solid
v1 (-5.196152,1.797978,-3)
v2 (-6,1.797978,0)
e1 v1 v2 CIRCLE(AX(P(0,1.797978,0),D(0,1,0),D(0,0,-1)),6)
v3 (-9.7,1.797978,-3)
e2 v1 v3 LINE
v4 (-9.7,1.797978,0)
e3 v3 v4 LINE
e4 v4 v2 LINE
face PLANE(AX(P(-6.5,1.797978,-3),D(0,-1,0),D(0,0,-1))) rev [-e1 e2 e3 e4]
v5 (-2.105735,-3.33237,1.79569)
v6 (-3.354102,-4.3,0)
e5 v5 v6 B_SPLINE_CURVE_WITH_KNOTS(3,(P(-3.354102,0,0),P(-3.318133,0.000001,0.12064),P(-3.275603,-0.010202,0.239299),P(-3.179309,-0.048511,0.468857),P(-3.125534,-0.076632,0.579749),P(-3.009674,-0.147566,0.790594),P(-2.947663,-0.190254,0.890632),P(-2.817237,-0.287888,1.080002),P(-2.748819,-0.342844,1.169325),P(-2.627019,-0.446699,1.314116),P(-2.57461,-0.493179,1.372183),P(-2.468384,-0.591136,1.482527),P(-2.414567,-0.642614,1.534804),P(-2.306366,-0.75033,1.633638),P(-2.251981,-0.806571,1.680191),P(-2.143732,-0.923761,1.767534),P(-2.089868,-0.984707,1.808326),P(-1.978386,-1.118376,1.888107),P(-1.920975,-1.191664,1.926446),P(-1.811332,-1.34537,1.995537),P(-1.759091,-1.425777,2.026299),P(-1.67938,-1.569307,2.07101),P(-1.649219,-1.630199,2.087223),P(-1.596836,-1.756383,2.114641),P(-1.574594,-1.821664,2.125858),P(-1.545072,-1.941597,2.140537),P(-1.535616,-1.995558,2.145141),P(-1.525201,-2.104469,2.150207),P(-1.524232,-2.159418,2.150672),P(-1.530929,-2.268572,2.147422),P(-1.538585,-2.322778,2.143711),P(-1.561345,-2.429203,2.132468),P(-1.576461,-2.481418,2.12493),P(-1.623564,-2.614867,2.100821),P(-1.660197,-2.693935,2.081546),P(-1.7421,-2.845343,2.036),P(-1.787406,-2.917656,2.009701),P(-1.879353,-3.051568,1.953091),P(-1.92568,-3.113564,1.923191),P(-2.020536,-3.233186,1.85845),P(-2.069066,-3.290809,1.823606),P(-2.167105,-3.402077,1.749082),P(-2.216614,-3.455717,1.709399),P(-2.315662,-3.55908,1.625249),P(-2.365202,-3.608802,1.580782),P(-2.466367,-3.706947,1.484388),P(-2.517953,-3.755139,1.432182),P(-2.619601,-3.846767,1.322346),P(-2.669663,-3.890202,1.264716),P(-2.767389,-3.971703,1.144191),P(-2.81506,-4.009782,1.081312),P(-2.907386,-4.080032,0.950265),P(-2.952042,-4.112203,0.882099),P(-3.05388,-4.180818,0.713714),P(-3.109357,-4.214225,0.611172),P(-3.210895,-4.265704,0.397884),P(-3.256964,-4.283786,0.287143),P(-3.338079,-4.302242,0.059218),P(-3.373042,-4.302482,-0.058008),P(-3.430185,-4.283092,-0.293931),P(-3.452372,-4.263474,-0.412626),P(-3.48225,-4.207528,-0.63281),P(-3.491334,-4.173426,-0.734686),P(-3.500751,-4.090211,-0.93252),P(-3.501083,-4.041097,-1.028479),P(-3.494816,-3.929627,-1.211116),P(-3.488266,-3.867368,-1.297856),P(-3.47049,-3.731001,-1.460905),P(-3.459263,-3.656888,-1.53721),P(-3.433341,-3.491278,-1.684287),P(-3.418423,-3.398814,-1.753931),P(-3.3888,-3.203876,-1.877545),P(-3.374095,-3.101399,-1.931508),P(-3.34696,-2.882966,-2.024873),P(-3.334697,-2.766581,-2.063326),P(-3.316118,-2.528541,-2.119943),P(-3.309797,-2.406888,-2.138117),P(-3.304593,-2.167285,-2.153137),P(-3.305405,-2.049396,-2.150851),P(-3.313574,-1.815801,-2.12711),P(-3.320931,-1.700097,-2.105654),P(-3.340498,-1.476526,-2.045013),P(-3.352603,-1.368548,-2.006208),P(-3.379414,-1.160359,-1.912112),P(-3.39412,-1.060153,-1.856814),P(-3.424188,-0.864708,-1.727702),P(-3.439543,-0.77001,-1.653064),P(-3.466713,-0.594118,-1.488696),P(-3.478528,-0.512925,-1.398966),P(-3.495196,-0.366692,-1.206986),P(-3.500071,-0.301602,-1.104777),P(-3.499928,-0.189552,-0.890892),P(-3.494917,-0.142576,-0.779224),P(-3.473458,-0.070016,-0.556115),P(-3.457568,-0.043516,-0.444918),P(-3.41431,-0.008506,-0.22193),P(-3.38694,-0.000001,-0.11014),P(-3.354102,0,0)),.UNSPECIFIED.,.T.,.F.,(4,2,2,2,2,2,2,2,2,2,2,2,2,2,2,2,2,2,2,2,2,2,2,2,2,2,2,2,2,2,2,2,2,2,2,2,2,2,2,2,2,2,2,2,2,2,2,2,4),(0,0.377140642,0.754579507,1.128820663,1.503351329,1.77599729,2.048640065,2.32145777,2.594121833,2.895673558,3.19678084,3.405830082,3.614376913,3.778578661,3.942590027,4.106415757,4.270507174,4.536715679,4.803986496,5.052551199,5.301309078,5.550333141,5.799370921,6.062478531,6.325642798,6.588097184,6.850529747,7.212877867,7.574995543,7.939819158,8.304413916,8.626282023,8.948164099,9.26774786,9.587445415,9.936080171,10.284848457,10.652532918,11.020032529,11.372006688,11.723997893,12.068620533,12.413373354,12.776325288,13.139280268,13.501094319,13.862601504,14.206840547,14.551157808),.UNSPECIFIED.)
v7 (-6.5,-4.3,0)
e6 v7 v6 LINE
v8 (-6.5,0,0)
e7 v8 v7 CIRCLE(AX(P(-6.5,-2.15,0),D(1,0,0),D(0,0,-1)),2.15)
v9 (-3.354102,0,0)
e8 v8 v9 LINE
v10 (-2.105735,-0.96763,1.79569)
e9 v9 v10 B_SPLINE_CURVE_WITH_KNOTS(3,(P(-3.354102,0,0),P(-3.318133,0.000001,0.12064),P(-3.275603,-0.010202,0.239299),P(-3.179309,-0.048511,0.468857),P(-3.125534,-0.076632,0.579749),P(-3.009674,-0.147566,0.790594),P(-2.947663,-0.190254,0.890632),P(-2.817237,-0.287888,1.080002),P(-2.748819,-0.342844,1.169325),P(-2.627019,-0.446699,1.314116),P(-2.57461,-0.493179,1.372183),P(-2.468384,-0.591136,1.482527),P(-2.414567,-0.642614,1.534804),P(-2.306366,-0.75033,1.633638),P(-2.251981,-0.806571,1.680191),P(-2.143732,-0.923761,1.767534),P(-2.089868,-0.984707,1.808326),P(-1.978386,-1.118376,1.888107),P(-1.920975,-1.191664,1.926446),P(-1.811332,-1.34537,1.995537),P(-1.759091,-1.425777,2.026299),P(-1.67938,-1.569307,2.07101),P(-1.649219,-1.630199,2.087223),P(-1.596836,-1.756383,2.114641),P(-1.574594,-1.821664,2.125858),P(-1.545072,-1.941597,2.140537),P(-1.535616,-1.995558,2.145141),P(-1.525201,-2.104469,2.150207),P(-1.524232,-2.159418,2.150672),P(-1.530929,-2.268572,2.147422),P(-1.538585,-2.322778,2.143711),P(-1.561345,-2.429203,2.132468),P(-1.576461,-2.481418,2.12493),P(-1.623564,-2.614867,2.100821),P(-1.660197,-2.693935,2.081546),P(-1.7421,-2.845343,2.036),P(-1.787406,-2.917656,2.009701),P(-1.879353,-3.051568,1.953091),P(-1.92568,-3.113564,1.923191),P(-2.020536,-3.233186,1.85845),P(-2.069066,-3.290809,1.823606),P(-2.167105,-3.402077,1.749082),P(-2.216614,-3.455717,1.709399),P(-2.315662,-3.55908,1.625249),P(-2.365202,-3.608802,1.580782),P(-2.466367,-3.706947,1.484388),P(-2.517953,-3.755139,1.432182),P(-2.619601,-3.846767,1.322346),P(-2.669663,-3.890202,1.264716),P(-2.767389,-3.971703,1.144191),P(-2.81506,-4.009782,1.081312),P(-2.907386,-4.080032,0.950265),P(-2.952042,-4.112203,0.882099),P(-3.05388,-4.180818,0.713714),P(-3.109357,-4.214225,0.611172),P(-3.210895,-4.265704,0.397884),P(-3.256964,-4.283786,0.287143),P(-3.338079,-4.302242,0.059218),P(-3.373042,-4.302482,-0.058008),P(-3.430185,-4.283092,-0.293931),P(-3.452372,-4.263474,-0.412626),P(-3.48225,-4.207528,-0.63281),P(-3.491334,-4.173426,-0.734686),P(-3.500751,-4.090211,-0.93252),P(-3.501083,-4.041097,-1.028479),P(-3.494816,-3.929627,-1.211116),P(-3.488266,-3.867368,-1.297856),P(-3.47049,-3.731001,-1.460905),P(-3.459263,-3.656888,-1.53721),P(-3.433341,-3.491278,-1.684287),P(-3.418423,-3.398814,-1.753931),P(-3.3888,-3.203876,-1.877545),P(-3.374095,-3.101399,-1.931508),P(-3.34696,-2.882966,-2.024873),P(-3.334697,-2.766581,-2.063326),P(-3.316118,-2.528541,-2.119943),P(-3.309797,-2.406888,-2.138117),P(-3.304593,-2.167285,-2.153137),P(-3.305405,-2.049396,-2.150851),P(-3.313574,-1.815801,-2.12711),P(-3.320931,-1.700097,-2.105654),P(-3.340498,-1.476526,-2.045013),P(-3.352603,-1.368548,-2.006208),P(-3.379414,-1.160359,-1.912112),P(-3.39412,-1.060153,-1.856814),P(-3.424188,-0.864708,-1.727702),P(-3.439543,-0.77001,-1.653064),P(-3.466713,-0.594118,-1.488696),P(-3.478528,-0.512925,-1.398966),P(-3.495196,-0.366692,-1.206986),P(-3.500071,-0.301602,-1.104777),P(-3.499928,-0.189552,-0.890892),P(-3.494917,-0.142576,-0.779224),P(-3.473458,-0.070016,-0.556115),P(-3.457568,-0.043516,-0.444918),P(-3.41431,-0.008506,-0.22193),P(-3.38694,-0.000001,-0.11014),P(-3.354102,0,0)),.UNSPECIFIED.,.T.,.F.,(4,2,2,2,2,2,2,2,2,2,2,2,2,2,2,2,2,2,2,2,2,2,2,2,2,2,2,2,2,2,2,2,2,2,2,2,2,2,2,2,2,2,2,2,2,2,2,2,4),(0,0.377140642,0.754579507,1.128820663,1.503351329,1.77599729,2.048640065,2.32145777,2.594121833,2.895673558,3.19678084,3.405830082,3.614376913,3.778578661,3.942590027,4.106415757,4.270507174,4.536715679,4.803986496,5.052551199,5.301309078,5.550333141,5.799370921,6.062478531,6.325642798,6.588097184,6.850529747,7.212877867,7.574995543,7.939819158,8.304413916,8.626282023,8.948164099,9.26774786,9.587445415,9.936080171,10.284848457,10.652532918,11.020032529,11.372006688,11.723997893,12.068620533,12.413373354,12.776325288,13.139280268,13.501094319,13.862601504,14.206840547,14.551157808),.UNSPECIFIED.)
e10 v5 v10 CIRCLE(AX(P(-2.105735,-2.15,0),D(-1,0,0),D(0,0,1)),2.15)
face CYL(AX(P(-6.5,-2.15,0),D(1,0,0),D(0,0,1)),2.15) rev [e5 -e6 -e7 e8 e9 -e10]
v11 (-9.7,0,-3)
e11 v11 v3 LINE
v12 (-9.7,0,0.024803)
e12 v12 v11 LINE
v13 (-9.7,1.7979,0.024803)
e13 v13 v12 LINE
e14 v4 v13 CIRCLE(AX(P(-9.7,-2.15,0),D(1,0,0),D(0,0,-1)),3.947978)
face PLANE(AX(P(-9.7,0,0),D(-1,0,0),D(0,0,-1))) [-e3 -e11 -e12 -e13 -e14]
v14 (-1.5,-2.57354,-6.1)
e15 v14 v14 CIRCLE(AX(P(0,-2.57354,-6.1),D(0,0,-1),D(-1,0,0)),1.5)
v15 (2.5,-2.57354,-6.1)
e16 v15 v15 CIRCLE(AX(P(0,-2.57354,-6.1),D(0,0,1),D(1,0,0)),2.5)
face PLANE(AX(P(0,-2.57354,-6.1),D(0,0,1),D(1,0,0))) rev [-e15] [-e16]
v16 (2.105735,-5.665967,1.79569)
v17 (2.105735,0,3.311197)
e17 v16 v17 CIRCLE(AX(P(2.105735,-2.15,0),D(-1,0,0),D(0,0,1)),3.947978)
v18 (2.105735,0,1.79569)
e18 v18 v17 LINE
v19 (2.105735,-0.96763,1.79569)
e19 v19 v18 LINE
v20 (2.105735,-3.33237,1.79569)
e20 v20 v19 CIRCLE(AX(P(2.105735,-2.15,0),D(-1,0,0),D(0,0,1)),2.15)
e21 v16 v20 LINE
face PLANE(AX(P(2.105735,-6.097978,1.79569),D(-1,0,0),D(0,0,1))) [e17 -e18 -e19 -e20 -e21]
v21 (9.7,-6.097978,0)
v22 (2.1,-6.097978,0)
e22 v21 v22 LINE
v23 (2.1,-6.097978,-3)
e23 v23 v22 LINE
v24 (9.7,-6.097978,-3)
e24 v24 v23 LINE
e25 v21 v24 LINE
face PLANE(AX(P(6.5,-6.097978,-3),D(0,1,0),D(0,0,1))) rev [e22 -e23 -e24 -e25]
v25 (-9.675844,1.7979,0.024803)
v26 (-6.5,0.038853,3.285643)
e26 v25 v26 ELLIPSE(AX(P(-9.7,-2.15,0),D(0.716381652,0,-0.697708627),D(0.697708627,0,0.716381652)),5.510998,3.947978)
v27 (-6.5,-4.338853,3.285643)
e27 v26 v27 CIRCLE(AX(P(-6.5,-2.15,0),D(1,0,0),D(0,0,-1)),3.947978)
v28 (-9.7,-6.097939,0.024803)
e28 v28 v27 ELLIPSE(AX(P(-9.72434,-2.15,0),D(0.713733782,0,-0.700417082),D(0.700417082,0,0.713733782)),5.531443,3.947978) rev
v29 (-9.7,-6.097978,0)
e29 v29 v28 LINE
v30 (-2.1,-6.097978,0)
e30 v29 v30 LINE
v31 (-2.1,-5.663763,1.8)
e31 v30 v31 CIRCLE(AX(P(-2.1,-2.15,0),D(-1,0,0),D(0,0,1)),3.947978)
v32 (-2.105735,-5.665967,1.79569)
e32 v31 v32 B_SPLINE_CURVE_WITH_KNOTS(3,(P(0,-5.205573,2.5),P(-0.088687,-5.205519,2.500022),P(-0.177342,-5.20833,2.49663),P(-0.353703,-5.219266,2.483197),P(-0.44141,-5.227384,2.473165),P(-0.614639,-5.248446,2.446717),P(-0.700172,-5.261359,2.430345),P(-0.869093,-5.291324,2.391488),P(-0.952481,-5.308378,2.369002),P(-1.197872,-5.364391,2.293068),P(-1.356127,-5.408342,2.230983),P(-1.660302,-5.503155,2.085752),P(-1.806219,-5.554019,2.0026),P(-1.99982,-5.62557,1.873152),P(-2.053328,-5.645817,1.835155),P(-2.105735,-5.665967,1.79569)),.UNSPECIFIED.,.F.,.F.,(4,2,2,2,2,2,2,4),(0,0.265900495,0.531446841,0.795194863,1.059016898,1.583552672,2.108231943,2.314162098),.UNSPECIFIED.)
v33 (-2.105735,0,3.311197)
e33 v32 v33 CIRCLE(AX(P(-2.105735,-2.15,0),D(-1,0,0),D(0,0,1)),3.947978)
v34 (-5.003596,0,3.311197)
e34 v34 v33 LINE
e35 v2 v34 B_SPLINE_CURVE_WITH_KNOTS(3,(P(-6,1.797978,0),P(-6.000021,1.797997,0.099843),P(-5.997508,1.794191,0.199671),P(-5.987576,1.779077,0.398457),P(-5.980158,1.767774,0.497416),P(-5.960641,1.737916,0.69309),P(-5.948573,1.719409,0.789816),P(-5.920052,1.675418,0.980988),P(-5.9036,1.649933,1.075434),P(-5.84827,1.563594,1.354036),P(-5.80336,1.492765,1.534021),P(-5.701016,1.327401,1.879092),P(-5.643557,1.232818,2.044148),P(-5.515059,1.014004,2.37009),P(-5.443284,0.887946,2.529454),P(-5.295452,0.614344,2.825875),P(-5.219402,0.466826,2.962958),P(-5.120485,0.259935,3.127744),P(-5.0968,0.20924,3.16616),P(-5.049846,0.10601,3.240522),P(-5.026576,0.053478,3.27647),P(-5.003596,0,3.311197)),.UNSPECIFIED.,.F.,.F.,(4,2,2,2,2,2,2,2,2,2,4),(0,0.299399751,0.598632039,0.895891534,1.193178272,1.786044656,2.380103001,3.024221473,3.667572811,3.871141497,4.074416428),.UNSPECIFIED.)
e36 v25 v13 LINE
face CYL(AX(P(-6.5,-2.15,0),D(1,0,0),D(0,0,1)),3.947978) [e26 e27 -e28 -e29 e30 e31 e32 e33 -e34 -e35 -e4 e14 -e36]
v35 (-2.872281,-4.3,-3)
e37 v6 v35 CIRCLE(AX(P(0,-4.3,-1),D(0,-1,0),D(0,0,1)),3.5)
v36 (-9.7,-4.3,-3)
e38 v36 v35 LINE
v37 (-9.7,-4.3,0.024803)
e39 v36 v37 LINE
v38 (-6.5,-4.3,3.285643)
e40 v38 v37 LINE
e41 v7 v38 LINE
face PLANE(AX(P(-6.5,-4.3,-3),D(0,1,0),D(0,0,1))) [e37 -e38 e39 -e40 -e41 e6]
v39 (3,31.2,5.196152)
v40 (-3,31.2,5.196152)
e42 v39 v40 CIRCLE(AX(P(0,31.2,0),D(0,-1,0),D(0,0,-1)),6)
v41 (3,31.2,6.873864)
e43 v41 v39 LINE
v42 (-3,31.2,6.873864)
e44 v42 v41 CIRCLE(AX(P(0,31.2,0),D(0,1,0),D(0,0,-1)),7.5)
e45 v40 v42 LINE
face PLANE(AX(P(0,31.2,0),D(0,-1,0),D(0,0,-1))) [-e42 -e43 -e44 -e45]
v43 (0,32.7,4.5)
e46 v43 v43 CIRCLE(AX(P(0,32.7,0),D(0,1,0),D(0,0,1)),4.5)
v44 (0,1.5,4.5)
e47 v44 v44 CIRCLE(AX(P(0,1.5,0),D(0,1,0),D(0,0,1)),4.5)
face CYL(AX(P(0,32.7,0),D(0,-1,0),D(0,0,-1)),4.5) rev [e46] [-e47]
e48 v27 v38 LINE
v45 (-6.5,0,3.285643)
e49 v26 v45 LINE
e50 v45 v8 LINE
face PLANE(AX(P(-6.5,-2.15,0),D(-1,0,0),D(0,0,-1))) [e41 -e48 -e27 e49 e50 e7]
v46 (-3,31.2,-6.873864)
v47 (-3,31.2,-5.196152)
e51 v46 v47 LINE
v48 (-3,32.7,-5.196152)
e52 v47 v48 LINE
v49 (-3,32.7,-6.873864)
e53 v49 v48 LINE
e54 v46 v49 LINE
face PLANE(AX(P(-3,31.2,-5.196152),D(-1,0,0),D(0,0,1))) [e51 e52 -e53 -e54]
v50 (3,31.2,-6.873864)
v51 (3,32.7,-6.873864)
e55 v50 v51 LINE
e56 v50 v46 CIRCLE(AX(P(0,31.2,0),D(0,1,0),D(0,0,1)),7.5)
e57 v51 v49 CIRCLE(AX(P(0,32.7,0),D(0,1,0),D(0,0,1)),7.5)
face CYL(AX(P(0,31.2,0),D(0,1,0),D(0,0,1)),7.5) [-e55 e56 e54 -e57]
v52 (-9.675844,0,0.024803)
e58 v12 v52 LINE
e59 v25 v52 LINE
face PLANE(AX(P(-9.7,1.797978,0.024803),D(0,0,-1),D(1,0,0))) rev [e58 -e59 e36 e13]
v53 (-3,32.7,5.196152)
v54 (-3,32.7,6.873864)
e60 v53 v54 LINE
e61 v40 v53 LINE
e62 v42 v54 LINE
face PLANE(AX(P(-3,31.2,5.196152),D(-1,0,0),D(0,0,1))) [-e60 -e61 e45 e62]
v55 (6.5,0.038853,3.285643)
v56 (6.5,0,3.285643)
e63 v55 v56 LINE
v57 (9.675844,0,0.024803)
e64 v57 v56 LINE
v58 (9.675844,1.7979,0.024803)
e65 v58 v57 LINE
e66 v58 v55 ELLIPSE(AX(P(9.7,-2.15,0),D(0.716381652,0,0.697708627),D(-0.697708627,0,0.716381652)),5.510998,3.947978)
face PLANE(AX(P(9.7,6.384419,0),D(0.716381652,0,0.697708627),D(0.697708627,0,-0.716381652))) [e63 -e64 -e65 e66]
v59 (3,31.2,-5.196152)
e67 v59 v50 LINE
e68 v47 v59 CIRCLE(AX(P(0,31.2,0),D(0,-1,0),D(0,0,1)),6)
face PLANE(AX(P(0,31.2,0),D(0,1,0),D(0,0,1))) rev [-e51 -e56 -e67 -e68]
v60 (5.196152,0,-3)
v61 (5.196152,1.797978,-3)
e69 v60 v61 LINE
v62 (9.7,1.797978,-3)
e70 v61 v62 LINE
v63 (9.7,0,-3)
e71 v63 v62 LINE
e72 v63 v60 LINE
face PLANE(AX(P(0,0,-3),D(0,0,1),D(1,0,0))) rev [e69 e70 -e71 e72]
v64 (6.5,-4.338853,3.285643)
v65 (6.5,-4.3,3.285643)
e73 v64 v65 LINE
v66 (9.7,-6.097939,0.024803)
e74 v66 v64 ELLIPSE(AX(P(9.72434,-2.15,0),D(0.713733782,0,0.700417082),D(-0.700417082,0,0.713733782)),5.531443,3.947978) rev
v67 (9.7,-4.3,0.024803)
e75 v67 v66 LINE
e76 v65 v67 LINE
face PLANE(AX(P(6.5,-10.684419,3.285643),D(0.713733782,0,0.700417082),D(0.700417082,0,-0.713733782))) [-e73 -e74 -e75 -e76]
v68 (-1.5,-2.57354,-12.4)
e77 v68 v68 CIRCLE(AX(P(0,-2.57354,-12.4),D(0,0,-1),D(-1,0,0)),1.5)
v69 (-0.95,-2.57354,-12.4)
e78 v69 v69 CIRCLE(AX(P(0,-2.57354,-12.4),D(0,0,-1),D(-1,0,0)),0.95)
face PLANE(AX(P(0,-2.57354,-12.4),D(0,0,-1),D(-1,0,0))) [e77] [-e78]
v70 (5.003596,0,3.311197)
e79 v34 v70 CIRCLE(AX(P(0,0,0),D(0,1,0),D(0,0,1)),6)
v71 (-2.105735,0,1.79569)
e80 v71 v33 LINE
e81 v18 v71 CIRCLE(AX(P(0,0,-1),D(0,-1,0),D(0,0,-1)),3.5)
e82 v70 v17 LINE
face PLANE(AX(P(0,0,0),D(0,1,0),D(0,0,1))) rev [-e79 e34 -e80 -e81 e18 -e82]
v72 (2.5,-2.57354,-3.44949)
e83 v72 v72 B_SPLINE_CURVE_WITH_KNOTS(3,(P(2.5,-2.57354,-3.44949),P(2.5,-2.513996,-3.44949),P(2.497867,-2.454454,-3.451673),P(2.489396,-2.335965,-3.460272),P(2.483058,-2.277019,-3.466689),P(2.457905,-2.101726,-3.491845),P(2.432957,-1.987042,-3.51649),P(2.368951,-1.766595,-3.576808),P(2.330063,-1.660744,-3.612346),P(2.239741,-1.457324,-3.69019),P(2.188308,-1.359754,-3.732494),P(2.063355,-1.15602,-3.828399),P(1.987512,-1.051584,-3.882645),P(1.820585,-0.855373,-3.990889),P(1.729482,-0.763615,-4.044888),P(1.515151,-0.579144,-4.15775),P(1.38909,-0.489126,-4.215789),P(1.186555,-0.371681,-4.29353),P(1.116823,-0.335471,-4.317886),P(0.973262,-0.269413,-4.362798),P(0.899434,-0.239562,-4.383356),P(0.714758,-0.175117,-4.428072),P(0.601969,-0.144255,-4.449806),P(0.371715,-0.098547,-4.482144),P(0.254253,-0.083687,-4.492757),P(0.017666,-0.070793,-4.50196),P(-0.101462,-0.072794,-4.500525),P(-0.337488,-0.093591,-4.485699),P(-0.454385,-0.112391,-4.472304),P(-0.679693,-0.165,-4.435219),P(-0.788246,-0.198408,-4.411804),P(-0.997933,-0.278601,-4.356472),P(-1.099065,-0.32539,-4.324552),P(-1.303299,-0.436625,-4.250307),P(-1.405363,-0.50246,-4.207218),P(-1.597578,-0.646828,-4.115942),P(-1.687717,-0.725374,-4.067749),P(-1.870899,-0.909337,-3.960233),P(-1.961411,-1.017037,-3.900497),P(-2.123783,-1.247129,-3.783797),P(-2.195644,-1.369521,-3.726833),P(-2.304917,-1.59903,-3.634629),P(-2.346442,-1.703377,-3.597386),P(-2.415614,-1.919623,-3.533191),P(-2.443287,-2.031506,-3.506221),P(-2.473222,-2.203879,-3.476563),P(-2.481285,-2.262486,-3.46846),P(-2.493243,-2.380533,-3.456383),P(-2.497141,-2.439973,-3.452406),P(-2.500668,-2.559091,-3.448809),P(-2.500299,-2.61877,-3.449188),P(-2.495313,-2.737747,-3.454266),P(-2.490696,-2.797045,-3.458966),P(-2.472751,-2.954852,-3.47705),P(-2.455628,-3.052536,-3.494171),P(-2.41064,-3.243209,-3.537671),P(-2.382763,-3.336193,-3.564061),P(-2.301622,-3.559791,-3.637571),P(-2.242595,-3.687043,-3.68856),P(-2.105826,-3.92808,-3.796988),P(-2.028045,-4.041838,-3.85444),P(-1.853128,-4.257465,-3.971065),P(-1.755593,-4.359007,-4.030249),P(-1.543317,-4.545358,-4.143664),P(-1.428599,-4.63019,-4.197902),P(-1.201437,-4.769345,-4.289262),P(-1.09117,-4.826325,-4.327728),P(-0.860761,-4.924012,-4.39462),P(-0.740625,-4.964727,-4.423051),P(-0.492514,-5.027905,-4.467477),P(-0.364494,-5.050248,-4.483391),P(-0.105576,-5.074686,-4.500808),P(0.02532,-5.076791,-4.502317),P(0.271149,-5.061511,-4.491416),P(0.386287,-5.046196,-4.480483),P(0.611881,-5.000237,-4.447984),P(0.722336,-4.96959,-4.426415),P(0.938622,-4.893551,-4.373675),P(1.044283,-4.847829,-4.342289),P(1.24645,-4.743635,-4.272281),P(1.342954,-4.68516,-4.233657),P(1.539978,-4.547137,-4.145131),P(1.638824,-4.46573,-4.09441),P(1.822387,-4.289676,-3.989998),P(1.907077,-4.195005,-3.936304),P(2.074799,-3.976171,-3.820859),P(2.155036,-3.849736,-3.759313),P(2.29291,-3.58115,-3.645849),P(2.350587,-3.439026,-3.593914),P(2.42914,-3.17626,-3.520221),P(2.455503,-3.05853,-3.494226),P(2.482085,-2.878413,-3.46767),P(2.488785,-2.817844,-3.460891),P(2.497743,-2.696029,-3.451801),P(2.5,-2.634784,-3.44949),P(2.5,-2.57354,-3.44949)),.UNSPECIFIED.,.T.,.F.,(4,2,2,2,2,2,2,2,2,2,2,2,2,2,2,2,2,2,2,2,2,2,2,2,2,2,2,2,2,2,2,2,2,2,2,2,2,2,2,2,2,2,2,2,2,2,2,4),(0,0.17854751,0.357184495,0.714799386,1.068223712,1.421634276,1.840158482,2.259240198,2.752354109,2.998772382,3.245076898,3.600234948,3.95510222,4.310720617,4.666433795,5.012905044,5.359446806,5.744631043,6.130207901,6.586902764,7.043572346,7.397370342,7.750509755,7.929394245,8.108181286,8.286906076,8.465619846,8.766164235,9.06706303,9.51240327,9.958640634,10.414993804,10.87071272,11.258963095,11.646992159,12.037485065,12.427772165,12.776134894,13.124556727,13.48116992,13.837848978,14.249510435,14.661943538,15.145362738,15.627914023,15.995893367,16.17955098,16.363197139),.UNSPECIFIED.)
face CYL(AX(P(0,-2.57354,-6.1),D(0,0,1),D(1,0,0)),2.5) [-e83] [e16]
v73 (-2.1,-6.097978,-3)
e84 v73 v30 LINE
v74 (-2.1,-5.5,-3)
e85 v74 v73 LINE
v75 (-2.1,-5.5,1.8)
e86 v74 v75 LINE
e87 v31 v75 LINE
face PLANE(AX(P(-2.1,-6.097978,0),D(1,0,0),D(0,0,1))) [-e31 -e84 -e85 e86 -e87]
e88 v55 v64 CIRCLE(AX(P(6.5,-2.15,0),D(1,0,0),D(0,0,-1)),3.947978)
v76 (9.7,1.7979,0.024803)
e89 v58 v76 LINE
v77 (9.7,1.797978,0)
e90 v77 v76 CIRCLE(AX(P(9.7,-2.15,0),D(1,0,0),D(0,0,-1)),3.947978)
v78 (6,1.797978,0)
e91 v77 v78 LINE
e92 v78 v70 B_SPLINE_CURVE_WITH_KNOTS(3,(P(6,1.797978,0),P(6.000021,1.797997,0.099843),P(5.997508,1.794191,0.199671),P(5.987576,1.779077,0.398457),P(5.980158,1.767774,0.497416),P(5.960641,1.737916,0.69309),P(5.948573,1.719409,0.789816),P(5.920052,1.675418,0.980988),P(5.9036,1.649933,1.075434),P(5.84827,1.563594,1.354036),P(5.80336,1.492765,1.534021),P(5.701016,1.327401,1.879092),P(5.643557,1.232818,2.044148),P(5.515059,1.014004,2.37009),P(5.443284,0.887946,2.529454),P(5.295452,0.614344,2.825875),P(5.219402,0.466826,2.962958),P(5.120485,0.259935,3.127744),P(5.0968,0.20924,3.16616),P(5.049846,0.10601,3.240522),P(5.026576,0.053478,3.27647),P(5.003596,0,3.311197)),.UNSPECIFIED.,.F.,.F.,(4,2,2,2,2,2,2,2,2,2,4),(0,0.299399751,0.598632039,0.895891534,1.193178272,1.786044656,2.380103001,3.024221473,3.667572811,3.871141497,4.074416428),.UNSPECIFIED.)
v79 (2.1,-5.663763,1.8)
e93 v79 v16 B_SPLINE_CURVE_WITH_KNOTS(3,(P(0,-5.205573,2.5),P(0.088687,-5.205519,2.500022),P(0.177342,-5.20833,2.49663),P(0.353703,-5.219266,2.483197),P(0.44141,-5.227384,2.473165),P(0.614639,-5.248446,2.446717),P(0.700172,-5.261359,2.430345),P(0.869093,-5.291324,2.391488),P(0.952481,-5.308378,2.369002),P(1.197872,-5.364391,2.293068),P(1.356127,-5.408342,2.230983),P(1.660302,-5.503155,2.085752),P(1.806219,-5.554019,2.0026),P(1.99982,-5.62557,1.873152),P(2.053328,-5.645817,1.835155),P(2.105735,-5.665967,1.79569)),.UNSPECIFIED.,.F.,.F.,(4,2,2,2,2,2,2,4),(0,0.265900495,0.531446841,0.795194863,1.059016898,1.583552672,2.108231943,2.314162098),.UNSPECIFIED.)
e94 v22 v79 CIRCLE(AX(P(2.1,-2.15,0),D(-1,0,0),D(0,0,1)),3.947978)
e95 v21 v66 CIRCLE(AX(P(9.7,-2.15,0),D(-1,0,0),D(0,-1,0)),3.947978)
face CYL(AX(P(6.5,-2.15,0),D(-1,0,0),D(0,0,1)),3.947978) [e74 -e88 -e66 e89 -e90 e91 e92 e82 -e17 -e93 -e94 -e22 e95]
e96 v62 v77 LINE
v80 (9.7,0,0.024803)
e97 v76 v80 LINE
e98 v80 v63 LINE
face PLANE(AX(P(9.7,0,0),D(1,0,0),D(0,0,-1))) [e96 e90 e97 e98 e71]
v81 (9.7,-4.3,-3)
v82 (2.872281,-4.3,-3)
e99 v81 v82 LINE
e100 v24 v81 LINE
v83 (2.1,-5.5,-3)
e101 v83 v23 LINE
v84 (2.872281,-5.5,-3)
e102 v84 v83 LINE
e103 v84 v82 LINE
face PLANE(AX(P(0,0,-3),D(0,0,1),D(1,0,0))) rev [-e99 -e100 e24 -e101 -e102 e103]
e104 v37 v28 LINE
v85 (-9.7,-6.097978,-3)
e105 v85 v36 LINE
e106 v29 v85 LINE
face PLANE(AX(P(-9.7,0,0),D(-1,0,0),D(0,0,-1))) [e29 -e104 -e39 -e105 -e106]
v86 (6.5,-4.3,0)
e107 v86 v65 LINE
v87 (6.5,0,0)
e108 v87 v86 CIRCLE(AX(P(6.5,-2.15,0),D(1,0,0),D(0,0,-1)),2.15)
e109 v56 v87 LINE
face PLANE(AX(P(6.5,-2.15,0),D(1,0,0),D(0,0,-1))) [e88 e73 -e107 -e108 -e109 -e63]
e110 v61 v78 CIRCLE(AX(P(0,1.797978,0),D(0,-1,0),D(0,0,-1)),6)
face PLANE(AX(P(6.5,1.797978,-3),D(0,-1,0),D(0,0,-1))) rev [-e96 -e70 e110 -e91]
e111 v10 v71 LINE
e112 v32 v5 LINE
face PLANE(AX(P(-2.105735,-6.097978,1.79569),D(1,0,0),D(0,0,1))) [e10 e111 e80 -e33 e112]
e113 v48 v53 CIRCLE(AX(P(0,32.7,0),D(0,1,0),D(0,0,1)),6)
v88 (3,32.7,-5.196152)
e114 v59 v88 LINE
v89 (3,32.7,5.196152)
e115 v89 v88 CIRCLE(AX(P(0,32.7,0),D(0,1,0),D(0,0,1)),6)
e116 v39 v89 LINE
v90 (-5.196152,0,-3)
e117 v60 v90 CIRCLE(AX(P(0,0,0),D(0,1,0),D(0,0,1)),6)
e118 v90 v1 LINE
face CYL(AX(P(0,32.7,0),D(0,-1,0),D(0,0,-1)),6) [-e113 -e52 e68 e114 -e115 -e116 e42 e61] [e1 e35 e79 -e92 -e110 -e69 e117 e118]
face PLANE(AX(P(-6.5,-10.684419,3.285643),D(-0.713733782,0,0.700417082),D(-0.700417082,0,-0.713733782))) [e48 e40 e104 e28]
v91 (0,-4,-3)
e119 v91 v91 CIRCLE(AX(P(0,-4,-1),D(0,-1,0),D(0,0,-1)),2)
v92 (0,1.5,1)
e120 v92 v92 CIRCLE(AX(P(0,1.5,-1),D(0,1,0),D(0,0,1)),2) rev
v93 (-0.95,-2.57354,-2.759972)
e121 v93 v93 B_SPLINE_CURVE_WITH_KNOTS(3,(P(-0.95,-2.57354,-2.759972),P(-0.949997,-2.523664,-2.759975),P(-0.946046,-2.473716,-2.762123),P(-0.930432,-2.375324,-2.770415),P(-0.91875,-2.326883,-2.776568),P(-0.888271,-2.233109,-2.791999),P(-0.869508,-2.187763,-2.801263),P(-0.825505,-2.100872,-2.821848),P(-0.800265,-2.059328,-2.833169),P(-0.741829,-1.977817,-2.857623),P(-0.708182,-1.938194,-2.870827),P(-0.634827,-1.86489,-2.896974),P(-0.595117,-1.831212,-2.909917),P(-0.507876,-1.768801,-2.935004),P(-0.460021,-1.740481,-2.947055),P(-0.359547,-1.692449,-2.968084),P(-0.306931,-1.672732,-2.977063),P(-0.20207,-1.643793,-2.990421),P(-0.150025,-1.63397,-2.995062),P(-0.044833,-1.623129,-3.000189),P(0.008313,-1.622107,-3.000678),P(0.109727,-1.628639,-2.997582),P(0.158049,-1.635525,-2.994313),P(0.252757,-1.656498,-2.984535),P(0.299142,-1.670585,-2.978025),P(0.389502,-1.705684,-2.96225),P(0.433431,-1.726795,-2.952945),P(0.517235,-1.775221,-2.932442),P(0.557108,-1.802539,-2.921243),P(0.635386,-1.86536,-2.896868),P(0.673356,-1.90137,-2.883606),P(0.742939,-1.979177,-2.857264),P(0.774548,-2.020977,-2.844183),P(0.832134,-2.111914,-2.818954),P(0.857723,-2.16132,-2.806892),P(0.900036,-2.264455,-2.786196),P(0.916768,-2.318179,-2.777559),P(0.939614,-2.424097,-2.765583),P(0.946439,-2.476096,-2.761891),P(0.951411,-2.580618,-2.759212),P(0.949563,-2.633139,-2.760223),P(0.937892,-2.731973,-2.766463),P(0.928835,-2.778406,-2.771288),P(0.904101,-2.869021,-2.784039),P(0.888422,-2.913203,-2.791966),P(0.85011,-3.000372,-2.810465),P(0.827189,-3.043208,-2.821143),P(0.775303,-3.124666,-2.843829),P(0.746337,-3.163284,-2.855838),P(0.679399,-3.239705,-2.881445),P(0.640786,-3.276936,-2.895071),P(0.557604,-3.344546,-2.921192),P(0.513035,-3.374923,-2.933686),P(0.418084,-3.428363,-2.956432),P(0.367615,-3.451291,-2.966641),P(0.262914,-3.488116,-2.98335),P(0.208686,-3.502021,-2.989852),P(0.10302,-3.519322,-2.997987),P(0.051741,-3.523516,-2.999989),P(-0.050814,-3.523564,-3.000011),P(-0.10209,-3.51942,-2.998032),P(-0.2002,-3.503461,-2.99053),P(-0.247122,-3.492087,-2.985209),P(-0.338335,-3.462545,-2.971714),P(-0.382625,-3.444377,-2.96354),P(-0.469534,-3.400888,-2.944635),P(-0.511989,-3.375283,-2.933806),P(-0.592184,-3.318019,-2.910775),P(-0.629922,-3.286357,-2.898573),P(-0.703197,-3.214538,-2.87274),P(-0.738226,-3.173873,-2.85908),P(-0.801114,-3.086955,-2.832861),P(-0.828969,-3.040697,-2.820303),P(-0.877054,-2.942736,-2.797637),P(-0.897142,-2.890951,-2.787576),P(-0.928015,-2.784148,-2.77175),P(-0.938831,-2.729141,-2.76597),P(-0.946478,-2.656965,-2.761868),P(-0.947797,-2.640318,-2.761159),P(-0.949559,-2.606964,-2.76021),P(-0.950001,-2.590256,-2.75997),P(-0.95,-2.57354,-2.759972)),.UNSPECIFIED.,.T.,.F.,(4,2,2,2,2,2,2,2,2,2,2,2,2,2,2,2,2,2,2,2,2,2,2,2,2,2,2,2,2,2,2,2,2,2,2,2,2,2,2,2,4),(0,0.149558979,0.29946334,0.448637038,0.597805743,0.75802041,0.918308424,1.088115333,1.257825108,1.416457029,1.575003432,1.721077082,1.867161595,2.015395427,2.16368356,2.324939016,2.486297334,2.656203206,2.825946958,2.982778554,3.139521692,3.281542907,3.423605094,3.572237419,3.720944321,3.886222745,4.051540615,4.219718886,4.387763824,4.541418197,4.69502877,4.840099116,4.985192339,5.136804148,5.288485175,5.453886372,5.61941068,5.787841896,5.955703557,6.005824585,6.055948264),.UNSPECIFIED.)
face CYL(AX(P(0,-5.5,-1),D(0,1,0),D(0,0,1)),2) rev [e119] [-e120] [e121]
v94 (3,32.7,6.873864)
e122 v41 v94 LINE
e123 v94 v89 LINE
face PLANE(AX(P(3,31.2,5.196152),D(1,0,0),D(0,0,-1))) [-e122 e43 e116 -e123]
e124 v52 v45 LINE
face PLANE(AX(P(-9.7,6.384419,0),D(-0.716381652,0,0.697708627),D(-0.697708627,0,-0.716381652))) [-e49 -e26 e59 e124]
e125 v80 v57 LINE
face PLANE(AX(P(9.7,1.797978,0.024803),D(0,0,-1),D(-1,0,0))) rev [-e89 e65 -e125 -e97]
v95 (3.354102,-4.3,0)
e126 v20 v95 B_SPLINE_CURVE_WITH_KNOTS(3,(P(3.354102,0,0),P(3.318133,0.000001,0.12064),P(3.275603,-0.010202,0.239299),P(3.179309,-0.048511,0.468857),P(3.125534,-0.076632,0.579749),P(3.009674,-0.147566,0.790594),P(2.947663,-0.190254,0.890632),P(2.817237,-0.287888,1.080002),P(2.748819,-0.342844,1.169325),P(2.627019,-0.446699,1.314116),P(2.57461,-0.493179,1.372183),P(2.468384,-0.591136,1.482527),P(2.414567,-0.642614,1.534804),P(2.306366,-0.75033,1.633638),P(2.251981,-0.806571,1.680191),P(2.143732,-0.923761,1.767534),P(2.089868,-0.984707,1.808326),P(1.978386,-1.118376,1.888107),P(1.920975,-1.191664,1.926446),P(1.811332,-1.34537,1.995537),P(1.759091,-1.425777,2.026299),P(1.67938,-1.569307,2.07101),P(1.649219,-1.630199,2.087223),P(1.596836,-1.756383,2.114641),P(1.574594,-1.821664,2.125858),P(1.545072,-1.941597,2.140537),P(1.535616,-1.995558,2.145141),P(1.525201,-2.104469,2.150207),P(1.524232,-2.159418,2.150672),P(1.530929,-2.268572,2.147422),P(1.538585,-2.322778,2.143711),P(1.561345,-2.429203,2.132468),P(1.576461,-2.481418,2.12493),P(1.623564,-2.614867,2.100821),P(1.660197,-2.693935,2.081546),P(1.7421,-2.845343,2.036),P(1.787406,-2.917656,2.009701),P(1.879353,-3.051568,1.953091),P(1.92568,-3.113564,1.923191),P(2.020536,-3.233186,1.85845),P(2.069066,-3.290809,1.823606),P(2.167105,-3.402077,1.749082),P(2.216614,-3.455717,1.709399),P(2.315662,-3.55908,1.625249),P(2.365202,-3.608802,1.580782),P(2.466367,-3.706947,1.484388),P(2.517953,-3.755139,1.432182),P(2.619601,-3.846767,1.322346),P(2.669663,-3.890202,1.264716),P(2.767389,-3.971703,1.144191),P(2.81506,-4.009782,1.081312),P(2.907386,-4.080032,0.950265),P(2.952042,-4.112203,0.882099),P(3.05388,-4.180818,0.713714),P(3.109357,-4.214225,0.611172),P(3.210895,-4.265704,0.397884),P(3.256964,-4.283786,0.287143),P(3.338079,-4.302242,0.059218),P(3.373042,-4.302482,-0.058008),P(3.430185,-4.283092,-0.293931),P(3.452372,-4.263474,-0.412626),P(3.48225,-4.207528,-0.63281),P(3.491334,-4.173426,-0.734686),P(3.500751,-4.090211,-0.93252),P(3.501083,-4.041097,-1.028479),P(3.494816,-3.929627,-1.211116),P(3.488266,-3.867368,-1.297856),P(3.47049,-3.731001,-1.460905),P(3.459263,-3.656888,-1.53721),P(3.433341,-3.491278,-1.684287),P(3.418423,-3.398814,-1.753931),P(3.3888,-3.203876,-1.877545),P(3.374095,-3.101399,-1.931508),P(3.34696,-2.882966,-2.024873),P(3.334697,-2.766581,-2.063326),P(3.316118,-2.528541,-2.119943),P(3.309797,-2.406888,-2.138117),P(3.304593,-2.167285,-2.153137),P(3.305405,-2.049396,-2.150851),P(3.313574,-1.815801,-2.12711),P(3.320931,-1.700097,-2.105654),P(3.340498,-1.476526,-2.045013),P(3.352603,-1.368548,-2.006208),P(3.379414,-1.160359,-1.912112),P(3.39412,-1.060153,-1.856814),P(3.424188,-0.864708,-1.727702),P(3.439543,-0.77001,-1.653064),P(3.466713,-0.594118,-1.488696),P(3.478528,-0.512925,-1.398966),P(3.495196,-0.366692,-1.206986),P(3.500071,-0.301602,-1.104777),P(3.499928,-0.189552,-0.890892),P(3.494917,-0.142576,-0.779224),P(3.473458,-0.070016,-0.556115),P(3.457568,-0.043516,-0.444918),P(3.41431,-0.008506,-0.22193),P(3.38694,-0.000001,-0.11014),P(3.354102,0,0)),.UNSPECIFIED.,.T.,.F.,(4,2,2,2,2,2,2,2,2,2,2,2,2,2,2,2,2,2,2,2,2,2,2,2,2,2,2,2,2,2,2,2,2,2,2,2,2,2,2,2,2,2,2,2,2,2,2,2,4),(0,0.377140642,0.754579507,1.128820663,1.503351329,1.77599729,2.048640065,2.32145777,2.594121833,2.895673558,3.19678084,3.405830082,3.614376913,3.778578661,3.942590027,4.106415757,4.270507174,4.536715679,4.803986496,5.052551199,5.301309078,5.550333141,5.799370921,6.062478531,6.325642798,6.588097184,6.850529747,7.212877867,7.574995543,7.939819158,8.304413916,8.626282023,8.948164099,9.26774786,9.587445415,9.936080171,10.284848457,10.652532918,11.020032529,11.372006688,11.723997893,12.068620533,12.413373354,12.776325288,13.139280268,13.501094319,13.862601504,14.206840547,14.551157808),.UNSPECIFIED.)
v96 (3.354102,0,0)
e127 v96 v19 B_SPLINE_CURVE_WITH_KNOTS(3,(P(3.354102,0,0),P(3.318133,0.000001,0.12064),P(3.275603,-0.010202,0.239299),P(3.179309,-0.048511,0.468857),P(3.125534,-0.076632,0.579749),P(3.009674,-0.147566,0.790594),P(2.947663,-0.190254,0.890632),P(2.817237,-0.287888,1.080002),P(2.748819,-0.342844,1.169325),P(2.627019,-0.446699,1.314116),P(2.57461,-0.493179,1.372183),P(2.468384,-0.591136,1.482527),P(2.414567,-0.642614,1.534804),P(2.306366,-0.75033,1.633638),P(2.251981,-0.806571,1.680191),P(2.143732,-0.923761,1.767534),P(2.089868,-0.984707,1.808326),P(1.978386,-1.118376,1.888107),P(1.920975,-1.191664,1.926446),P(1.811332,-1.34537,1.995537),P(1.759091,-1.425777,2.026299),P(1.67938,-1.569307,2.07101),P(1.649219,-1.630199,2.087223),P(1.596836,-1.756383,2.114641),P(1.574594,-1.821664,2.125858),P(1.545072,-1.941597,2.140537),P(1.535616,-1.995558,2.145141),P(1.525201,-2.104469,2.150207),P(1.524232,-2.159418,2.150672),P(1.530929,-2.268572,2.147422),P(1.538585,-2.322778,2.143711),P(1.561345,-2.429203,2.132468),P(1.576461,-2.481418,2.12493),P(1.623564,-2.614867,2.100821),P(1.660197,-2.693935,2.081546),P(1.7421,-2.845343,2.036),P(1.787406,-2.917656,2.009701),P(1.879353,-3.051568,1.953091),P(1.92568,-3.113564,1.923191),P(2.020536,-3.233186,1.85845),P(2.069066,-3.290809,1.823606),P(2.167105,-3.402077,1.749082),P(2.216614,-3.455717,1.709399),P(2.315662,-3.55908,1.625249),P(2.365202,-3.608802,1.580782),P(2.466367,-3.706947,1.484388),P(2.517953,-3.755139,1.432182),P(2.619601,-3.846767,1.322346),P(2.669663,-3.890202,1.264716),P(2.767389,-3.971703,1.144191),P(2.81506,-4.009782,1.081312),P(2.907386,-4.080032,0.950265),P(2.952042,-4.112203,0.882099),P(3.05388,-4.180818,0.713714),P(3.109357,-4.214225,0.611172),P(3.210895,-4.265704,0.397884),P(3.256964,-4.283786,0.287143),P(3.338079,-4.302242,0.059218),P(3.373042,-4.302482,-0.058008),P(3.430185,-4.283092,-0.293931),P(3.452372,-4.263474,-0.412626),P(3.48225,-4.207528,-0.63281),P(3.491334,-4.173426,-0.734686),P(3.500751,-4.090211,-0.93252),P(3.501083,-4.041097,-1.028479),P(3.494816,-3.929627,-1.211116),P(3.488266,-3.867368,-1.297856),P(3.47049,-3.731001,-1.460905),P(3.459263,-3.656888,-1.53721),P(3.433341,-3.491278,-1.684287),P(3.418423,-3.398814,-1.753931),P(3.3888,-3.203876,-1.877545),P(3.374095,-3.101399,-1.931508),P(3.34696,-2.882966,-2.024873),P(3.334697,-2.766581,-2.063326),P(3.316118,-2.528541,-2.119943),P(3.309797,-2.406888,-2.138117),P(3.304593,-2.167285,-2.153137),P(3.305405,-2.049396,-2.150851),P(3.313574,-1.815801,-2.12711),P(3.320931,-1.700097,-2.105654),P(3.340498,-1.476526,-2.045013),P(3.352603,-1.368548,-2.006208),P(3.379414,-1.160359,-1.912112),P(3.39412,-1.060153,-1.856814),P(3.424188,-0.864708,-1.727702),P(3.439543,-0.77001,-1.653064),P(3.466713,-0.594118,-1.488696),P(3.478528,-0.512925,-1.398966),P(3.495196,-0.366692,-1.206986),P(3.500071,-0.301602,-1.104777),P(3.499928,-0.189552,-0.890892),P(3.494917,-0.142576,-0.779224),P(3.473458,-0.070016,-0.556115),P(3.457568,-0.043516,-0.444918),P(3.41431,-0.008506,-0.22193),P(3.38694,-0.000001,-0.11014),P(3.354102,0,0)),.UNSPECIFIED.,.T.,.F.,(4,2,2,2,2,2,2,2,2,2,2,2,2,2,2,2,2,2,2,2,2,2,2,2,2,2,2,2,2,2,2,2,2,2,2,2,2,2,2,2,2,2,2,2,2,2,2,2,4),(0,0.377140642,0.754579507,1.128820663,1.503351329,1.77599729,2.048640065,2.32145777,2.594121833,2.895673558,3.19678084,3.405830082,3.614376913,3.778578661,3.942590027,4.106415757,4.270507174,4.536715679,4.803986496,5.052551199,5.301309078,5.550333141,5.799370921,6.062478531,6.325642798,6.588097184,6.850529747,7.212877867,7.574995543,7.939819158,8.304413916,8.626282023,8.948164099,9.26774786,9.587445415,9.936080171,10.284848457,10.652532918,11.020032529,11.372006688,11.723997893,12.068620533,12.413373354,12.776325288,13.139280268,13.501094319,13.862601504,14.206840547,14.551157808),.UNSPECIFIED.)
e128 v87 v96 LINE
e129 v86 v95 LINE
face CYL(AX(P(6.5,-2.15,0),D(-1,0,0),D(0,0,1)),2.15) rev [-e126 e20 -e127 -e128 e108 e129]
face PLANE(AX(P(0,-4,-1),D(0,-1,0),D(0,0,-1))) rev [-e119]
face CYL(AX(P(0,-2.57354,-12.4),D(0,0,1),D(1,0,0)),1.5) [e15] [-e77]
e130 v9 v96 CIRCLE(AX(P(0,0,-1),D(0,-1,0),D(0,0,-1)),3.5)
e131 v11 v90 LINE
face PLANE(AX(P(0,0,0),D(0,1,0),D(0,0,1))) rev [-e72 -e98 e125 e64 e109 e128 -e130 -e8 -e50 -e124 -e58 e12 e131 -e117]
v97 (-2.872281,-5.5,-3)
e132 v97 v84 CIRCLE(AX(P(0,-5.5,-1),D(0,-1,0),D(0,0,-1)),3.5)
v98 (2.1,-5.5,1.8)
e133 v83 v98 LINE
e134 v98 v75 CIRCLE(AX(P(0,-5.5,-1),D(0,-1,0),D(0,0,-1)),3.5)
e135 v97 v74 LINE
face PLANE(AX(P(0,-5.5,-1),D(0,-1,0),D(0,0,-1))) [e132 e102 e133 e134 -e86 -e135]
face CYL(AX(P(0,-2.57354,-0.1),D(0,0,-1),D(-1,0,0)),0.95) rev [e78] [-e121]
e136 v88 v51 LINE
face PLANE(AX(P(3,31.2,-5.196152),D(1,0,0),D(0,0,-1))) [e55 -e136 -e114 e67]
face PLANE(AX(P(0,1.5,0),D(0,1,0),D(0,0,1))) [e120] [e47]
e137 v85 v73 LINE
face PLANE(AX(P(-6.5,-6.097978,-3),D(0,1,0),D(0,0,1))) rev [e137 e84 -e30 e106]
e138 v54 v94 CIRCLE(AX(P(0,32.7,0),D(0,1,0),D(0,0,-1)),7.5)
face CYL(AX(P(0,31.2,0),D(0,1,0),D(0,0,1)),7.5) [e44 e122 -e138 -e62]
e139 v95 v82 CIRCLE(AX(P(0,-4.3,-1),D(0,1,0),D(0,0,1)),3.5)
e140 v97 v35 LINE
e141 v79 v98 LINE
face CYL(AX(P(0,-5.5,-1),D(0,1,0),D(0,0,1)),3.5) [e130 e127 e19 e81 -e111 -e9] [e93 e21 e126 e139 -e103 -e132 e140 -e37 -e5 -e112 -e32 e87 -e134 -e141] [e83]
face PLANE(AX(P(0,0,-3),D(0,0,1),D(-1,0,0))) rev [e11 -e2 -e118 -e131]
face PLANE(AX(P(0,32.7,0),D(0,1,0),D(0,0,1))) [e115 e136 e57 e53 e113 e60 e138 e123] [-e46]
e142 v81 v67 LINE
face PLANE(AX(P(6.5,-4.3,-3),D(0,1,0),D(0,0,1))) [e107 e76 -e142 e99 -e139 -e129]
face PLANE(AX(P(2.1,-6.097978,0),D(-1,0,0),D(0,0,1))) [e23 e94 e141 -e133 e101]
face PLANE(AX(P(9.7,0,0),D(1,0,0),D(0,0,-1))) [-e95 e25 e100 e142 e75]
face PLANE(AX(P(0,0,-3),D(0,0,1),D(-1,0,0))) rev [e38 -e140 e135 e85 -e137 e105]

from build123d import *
from build123d.topology import SkipClean

# Parameters (mm, degrees)
SKETCH1_R            = 6
BOSS_EXTRUDE1_DEPTH  = 32.7
SHELL1_T             = -1.5
SKETCH2_R            = 3.5
BOSS_EXTRUDE3_DEPTH  = 5.5
SHELL3_START         = -4
SHELL3_OUTLINE_R     = 2
SHELL3_DEPTH         = 5.5
SKETCH4_R            = 2.5
BOSS_EXTRUDE4_DEPTH  = 6.1
SKETCH7_R            = 1.5
BOSS_EXTRUDE6_DEPTH  = 6.3
SKETCH8_R            = 0.95
CUT_EXTRUDE1_DEPTH   = 12.3
SKETCH9_R            = 2
CUT_EXTRUDE2_DEPTH   = 40.200127551
BOSS_EXTRUDE7_DEPTH  = 6.5
SKETCH11_W           = 2.1
SKETCH11_H           = 4.759411023
CUT_EXTRUDE3_DEPTH   = 41.684763873
CUT_EXTRUDE4_DEPTH   = 36.571055794
SKETCH13_W           = 4.4
SKETCH13_H           = 1.797977648
BOSS_EXTRUDE8_DEPTH  = 3
SKETCH15_W           = 4.39606385
SKETCH15_H           = 1.797977648
BOSS_EXTRUDE9_DEPTH  = 3
SKETCH16_R           = 2
CUT_EXTRUDE5_DEPTH   = 40.279765925
SKETCH17_R           = 4.5
CUT_EXTRUDE6_DEPTH   = 35.197222256
SKETCH18_W           = 3.024802645
SKETCH18_H           = 1.797977648
BOSS_EXTRUDE10_DEPTH = 3.2
BOSS_EXTRUDE11_DEPTH = 1.797977648
CUT_EXTRUDE11_DEPTH  = 38.138928519
BOSS_EXTRUDE12_DEPTH = 1.797977648
CUT_EXTRUDE12_DEPTH  = 38.138928519
BOSS_EXTRUDE13_START = -1.5
BOSS_EXTRUDE13_DEPTH = 1.5


# Read off the part's stored shape, not the designer's step: Shell3
with BuildPart() as part:
    # Sketch1 → Boss-Extrude1 (new body)
    with BuildSketch(Plane(origin=(0, 0, 0), x_dir=(1, 0, 0), z_dir=(0, 1, 0))):
        with Locations(Location((0, 0, 0), (0, 0, 270))):
            Circle(SKETCH1_R)
    extrude(amount=BOSS_EXTRUDE1_DEPTH)

    # Shell1
    shell1_openings = [part.faces().sort_by_distance(p)[0] for p in [
        (0, 32.7, 0),
    ]]
    offset(amount=SHELL1_T, openings=shell1_openings, kind=Kind.INTERSECTION)

    # Sketch2 → Boss-Extrude3 (add)
    with BuildSketch(Plane.XZ):
        with Locations(Location((0, -1, 0), (0, 0, 270))):
            Circle(SKETCH2_R)
    extrude(amount=BOSS_EXTRUDE3_DEPTH)

    # Shell3 outline → Shell3 (cut)
    with BuildSketch(Plane(origin=(0, 0, 0), x_dir=(1, 0, 0), z_dir=(0, 1, 0)).offset(SHELL3_START)):
        with Locations((0, 1)):
            Circle(SHELL3_OUTLINE_R)
    extrude(amount=SHELL3_DEPTH, mode=Mode.SUBTRACT)

    # Sketch4 → Boss-Extrude4 (add)
    with BuildSketch(Plane.XY):
        with Locations((0, -2.573540176)):
            Circle(SKETCH4_R)
    extrude(amount=-BOSS_EXTRUDE4_DEPTH)

    # Sketch7 → Boss-Extrude6 (add)
    with BuildSketch(Plane(origin=(0, 0, -6.1), x_dir=(-1, 0, 0), z_dir=(0, 0, -1))):
        with Locations((0, -2.573540176)):
            Circle(SKETCH7_R)
    extrude(amount=BOSS_EXTRUDE6_DEPTH)

    # Sketch8 → Cut-Extrude1 (cut)
    with BuildSketch(Plane(origin=(0, 0, -12.4), x_dir=(-1, 0, 0), z_dir=(0, 0, -1))):
        with Locations((0, -2.573540176)):
            Circle(SKETCH8_R)
    extrude(amount=-CUT_EXTRUDE1_DEPTH, mode=Mode.SUBTRACT)

    # Sketch9 → Cut-Extrude2 (cut, through all)
    with BuildSketch(Plane(origin=(0, -4, 0), x_dir=(1, 0, 0), z_dir=(0, 1, 0))):
        with Locations(Location((0, 1, 0), (0, 0, 270))):
            Circle(SKETCH9_R)
    extrude(amount=CUT_EXTRUDE2_DEPTH, mode=Mode.SUBTRACT)

    # Sketch10 → Boss-Extrude7 (add)
    with BuildSketch(Plane(origin=(0, 0, 0), x_dir=(0, 0, -1), z_dir=(1, 0, 0))):
        with BuildLine():
            Line((0, -4.3), (0, -6.097977648))
            ThreePointArc((0, -6.097977648), (-3.947977648, -2.15), (0, 1.797977648))
            Line((0, 1.797977648), (0, 0))
            ThreePointArc((0, 0), (-2.15, -2.15), (0, -4.3))
        make_face()
    extrude(amount=BOSS_EXTRUDE7_DEPTH)

    # Sketch11 → Cut-Extrude3 (cut, through all)
    with BuildSketch(Plane.XZ.offset(5.5)):
        with Locations((1.05, 2.379705512)):
            Rectangle(SKETCH11_W, SKETCH11_H)
    extrude(amount=CUT_EXTRUDE3_DEPTH, mode=Mode.SUBTRACT)

    # Sketch12 → Cut-Extrude4 (cut, through all)
    with BuildSketch(Plane.XZ):
        with BuildLine():
            Line((2.105734518, 1.795689922), (2.105734518, 3.947977648))
            Line((2.105734518, 3.947977648), (0, 3.947977648))
            Line((0, 3.947977648), (0, 2.5))
            ThreePointArc((0, 2.5), (1.110199368, 2.319255544), (2.105734518, 1.795689922))
        make_face()
    extrude(amount=CUT_EXTRUDE4_DEPTH, mode=Mode.SUBTRACT)

    # Sketch13 → Boss-Extrude8 (add)
    with BuildSketch(Plane(origin=(0, 0, 0), x_dir=(-1, 0, 0), z_dir=(0, 0, -1))):
        with Locations((-4.3, -5.198988824)):
            Rectangle(SKETCH13_W, SKETCH13_H)
    extrude(amount=BOSS_EXTRUDE8_DEPTH)

    # Sketch15 → Boss-Extrude9 (add)
    with SkipClean():  # the faces are left unmerged after this step: merging them gives an invalid solid
        with BuildSketch(Plane(origin=(0, 0, 0), x_dir=(-1, 0, 0), z_dir=(0, 0, -1))):
            with Locations((-4.301968075, 0.898988824)):
                Rectangle(SKETCH15_W, SKETCH15_H)
        extrude(amount=BOSS_EXTRUDE9_DEPTH)

    # Sketch16 → Cut-Extrude5 (cut, through all)
    with SkipClean():  # the faces are left unmerged after this step: merging them gives an invalid solid
        with BuildSketch(Plane(origin=(0, -4, 0), x_dir=(1, 0, 0), z_dir=(0, 1, 0))):
            with Locations(Location((0, 1, 0), (0, 0, 270))):
                Circle(SKETCH16_R)
        extrude(amount=CUT_EXTRUDE5_DEPTH, mode=Mode.SUBTRACT)

    # Sketch17 → Cut-Extrude6 (cut, through all)
    with SkipClean():  # the faces are left unmerged after this step: merging them gives an invalid solid
        with BuildSketch(Plane(origin=(0, 1.5, 0), x_dir=(1, 0, 0), z_dir=(0, 1, 0))):
            with Locations(Location((0, 0, 0), (0, 0, 270))):
                Circle(SKETCH17_R)
        extrude(amount=CUT_EXTRUDE6_DEPTH, mode=Mode.SUBTRACT)

    # Sketch18 → Boss-Extrude10 (add)
    with SkipClean():  # the faces are left unmerged after this step: merging them gives an invalid solid
        with BuildSketch(Plane(origin=(6.5, 0, 0), x_dir=(0, 0, -1), z_dir=(1, 0, 0))):
            with Locations((1.487598678, 0.898988824)):
                Rectangle(SKETCH18_W, SKETCH18_H)
            with Locations((1.487598678, -5.198988824)):
                Rectangle(SKETCH18_W, SKETCH18_H)
        extrude(amount=BOSS_EXTRUDE10_DEPTH)

    # Sketch19 → Boss-Extrude11 (add)
    with SkipClean():  # the faces are left unmerged after this step: merging them gives an invalid solid
        with BuildSketch(Plane(origin=(0, -4.3, 0), x_dir=(1, 0, 0), z_dir=(0, 1, 0))):
            Polygon((6.5, -3.285642739), (6.5, 0), (9.7, -0.024802645), align=None)
        extrude(amount=-BOSS_EXTRUDE11_DEPTH)

    # Sketch22 → Cut-Extrude11 (cut, through all)
    with SkipClean():  # the faces are left unmerged after this step: merging them gives an invalid solid
        with BuildSketch(Plane.ZY.offset(-6.5)):
            with BuildLine():
                Line((0, -6.097977648), (3.285642739, -6.097977648))
                Line((3.285642739, -6.097977648), (3.285642739, -4.33885342))
                ThreePointArc((3.285642739, -4.33885342), (1.863462252, -5.630522366), (0, -6.097977648))
            make_face()
        extrude(amount=-CUT_EXTRUDE11_DEPTH, mode=Mode.SUBTRACT)

    # Sketch24 → Boss-Extrude12 (add)
    with SkipClean():  # the faces are left unmerged after this step: merging them gives an invalid solid
        with BuildSketch(Plane.XZ):
            Polygon((9.7, 0), (6.5, 3.285642739), (6.5, 0.012401323), align=None)
        extrude(amount=-BOSS_EXTRUDE12_DEPTH)

    # Sketch25 → Cut-Extrude12 (cut, through all)
    with SkipClean():  # the faces are left unmerged after this step: merging them gives an invalid solid
        with BuildSketch(Plane.ZY.offset(-6.5)):
            with BuildLine():
                Line((3.285642739, 0.03885342), (3.285642739, 1.797977648))
                Line((3.285642739, 1.797977648), (0, 1.797977648))
                ThreePointArc((0, 1.797977648), (1.863462252, 1.330522366), (3.285642739, 0.03885342))
            make_face()
        extrude(amount=-CUT_EXTRUDE12_DEPTH, mode=Mode.SUBTRACT)

    # Mirror3: part across plane


with BuildPart() as part_1:
    add(part.part)
    add(part.part.mirror(Plane(origin=(0, 0, 0), x_dir=(0, 0, 1), z_dir=(1, 0, 0))))

    # Sketch26 → Boss-Extrude13 (add)
    with SkipClean():  # the faces are left unmerged after this step: merging them gives an invalid solid
        with BuildSketch(Plane(origin=(0, 32.7, 0), x_dir=(1, 0, 0), z_dir=(0, 1, 0)).offset(BOSS_EXTRUDE13_START)):
            with BuildLine():
                Line((3, 5.196152423), (3, 6.873863542))
                ThreePointArc((3, 6.873863542), (0, 7.5), (-3, 6.873863542))
                Line((-3, 6.873863542), (-3, 5.196152423))
                ThreePointArc((-3, 5.196152423), (0, 6), (3, 5.196152423))
            make_face()
            with BuildLine():
                Line((3, -5.196152423), (3, -6.873863542))
                ThreePointArc((3, -6.873863542), (0, -7.5), (-3, -6.873863542))
                Line((-3, -6.873863542), (-3, -5.196152423))
                ThreePointArc((-3, -5.196152423), (0, -6), (3, -5.196152423))
            make_face()
        extrude(amount=BOSS_EXTRUDE13_DEPTH)


solid = part_1.part
